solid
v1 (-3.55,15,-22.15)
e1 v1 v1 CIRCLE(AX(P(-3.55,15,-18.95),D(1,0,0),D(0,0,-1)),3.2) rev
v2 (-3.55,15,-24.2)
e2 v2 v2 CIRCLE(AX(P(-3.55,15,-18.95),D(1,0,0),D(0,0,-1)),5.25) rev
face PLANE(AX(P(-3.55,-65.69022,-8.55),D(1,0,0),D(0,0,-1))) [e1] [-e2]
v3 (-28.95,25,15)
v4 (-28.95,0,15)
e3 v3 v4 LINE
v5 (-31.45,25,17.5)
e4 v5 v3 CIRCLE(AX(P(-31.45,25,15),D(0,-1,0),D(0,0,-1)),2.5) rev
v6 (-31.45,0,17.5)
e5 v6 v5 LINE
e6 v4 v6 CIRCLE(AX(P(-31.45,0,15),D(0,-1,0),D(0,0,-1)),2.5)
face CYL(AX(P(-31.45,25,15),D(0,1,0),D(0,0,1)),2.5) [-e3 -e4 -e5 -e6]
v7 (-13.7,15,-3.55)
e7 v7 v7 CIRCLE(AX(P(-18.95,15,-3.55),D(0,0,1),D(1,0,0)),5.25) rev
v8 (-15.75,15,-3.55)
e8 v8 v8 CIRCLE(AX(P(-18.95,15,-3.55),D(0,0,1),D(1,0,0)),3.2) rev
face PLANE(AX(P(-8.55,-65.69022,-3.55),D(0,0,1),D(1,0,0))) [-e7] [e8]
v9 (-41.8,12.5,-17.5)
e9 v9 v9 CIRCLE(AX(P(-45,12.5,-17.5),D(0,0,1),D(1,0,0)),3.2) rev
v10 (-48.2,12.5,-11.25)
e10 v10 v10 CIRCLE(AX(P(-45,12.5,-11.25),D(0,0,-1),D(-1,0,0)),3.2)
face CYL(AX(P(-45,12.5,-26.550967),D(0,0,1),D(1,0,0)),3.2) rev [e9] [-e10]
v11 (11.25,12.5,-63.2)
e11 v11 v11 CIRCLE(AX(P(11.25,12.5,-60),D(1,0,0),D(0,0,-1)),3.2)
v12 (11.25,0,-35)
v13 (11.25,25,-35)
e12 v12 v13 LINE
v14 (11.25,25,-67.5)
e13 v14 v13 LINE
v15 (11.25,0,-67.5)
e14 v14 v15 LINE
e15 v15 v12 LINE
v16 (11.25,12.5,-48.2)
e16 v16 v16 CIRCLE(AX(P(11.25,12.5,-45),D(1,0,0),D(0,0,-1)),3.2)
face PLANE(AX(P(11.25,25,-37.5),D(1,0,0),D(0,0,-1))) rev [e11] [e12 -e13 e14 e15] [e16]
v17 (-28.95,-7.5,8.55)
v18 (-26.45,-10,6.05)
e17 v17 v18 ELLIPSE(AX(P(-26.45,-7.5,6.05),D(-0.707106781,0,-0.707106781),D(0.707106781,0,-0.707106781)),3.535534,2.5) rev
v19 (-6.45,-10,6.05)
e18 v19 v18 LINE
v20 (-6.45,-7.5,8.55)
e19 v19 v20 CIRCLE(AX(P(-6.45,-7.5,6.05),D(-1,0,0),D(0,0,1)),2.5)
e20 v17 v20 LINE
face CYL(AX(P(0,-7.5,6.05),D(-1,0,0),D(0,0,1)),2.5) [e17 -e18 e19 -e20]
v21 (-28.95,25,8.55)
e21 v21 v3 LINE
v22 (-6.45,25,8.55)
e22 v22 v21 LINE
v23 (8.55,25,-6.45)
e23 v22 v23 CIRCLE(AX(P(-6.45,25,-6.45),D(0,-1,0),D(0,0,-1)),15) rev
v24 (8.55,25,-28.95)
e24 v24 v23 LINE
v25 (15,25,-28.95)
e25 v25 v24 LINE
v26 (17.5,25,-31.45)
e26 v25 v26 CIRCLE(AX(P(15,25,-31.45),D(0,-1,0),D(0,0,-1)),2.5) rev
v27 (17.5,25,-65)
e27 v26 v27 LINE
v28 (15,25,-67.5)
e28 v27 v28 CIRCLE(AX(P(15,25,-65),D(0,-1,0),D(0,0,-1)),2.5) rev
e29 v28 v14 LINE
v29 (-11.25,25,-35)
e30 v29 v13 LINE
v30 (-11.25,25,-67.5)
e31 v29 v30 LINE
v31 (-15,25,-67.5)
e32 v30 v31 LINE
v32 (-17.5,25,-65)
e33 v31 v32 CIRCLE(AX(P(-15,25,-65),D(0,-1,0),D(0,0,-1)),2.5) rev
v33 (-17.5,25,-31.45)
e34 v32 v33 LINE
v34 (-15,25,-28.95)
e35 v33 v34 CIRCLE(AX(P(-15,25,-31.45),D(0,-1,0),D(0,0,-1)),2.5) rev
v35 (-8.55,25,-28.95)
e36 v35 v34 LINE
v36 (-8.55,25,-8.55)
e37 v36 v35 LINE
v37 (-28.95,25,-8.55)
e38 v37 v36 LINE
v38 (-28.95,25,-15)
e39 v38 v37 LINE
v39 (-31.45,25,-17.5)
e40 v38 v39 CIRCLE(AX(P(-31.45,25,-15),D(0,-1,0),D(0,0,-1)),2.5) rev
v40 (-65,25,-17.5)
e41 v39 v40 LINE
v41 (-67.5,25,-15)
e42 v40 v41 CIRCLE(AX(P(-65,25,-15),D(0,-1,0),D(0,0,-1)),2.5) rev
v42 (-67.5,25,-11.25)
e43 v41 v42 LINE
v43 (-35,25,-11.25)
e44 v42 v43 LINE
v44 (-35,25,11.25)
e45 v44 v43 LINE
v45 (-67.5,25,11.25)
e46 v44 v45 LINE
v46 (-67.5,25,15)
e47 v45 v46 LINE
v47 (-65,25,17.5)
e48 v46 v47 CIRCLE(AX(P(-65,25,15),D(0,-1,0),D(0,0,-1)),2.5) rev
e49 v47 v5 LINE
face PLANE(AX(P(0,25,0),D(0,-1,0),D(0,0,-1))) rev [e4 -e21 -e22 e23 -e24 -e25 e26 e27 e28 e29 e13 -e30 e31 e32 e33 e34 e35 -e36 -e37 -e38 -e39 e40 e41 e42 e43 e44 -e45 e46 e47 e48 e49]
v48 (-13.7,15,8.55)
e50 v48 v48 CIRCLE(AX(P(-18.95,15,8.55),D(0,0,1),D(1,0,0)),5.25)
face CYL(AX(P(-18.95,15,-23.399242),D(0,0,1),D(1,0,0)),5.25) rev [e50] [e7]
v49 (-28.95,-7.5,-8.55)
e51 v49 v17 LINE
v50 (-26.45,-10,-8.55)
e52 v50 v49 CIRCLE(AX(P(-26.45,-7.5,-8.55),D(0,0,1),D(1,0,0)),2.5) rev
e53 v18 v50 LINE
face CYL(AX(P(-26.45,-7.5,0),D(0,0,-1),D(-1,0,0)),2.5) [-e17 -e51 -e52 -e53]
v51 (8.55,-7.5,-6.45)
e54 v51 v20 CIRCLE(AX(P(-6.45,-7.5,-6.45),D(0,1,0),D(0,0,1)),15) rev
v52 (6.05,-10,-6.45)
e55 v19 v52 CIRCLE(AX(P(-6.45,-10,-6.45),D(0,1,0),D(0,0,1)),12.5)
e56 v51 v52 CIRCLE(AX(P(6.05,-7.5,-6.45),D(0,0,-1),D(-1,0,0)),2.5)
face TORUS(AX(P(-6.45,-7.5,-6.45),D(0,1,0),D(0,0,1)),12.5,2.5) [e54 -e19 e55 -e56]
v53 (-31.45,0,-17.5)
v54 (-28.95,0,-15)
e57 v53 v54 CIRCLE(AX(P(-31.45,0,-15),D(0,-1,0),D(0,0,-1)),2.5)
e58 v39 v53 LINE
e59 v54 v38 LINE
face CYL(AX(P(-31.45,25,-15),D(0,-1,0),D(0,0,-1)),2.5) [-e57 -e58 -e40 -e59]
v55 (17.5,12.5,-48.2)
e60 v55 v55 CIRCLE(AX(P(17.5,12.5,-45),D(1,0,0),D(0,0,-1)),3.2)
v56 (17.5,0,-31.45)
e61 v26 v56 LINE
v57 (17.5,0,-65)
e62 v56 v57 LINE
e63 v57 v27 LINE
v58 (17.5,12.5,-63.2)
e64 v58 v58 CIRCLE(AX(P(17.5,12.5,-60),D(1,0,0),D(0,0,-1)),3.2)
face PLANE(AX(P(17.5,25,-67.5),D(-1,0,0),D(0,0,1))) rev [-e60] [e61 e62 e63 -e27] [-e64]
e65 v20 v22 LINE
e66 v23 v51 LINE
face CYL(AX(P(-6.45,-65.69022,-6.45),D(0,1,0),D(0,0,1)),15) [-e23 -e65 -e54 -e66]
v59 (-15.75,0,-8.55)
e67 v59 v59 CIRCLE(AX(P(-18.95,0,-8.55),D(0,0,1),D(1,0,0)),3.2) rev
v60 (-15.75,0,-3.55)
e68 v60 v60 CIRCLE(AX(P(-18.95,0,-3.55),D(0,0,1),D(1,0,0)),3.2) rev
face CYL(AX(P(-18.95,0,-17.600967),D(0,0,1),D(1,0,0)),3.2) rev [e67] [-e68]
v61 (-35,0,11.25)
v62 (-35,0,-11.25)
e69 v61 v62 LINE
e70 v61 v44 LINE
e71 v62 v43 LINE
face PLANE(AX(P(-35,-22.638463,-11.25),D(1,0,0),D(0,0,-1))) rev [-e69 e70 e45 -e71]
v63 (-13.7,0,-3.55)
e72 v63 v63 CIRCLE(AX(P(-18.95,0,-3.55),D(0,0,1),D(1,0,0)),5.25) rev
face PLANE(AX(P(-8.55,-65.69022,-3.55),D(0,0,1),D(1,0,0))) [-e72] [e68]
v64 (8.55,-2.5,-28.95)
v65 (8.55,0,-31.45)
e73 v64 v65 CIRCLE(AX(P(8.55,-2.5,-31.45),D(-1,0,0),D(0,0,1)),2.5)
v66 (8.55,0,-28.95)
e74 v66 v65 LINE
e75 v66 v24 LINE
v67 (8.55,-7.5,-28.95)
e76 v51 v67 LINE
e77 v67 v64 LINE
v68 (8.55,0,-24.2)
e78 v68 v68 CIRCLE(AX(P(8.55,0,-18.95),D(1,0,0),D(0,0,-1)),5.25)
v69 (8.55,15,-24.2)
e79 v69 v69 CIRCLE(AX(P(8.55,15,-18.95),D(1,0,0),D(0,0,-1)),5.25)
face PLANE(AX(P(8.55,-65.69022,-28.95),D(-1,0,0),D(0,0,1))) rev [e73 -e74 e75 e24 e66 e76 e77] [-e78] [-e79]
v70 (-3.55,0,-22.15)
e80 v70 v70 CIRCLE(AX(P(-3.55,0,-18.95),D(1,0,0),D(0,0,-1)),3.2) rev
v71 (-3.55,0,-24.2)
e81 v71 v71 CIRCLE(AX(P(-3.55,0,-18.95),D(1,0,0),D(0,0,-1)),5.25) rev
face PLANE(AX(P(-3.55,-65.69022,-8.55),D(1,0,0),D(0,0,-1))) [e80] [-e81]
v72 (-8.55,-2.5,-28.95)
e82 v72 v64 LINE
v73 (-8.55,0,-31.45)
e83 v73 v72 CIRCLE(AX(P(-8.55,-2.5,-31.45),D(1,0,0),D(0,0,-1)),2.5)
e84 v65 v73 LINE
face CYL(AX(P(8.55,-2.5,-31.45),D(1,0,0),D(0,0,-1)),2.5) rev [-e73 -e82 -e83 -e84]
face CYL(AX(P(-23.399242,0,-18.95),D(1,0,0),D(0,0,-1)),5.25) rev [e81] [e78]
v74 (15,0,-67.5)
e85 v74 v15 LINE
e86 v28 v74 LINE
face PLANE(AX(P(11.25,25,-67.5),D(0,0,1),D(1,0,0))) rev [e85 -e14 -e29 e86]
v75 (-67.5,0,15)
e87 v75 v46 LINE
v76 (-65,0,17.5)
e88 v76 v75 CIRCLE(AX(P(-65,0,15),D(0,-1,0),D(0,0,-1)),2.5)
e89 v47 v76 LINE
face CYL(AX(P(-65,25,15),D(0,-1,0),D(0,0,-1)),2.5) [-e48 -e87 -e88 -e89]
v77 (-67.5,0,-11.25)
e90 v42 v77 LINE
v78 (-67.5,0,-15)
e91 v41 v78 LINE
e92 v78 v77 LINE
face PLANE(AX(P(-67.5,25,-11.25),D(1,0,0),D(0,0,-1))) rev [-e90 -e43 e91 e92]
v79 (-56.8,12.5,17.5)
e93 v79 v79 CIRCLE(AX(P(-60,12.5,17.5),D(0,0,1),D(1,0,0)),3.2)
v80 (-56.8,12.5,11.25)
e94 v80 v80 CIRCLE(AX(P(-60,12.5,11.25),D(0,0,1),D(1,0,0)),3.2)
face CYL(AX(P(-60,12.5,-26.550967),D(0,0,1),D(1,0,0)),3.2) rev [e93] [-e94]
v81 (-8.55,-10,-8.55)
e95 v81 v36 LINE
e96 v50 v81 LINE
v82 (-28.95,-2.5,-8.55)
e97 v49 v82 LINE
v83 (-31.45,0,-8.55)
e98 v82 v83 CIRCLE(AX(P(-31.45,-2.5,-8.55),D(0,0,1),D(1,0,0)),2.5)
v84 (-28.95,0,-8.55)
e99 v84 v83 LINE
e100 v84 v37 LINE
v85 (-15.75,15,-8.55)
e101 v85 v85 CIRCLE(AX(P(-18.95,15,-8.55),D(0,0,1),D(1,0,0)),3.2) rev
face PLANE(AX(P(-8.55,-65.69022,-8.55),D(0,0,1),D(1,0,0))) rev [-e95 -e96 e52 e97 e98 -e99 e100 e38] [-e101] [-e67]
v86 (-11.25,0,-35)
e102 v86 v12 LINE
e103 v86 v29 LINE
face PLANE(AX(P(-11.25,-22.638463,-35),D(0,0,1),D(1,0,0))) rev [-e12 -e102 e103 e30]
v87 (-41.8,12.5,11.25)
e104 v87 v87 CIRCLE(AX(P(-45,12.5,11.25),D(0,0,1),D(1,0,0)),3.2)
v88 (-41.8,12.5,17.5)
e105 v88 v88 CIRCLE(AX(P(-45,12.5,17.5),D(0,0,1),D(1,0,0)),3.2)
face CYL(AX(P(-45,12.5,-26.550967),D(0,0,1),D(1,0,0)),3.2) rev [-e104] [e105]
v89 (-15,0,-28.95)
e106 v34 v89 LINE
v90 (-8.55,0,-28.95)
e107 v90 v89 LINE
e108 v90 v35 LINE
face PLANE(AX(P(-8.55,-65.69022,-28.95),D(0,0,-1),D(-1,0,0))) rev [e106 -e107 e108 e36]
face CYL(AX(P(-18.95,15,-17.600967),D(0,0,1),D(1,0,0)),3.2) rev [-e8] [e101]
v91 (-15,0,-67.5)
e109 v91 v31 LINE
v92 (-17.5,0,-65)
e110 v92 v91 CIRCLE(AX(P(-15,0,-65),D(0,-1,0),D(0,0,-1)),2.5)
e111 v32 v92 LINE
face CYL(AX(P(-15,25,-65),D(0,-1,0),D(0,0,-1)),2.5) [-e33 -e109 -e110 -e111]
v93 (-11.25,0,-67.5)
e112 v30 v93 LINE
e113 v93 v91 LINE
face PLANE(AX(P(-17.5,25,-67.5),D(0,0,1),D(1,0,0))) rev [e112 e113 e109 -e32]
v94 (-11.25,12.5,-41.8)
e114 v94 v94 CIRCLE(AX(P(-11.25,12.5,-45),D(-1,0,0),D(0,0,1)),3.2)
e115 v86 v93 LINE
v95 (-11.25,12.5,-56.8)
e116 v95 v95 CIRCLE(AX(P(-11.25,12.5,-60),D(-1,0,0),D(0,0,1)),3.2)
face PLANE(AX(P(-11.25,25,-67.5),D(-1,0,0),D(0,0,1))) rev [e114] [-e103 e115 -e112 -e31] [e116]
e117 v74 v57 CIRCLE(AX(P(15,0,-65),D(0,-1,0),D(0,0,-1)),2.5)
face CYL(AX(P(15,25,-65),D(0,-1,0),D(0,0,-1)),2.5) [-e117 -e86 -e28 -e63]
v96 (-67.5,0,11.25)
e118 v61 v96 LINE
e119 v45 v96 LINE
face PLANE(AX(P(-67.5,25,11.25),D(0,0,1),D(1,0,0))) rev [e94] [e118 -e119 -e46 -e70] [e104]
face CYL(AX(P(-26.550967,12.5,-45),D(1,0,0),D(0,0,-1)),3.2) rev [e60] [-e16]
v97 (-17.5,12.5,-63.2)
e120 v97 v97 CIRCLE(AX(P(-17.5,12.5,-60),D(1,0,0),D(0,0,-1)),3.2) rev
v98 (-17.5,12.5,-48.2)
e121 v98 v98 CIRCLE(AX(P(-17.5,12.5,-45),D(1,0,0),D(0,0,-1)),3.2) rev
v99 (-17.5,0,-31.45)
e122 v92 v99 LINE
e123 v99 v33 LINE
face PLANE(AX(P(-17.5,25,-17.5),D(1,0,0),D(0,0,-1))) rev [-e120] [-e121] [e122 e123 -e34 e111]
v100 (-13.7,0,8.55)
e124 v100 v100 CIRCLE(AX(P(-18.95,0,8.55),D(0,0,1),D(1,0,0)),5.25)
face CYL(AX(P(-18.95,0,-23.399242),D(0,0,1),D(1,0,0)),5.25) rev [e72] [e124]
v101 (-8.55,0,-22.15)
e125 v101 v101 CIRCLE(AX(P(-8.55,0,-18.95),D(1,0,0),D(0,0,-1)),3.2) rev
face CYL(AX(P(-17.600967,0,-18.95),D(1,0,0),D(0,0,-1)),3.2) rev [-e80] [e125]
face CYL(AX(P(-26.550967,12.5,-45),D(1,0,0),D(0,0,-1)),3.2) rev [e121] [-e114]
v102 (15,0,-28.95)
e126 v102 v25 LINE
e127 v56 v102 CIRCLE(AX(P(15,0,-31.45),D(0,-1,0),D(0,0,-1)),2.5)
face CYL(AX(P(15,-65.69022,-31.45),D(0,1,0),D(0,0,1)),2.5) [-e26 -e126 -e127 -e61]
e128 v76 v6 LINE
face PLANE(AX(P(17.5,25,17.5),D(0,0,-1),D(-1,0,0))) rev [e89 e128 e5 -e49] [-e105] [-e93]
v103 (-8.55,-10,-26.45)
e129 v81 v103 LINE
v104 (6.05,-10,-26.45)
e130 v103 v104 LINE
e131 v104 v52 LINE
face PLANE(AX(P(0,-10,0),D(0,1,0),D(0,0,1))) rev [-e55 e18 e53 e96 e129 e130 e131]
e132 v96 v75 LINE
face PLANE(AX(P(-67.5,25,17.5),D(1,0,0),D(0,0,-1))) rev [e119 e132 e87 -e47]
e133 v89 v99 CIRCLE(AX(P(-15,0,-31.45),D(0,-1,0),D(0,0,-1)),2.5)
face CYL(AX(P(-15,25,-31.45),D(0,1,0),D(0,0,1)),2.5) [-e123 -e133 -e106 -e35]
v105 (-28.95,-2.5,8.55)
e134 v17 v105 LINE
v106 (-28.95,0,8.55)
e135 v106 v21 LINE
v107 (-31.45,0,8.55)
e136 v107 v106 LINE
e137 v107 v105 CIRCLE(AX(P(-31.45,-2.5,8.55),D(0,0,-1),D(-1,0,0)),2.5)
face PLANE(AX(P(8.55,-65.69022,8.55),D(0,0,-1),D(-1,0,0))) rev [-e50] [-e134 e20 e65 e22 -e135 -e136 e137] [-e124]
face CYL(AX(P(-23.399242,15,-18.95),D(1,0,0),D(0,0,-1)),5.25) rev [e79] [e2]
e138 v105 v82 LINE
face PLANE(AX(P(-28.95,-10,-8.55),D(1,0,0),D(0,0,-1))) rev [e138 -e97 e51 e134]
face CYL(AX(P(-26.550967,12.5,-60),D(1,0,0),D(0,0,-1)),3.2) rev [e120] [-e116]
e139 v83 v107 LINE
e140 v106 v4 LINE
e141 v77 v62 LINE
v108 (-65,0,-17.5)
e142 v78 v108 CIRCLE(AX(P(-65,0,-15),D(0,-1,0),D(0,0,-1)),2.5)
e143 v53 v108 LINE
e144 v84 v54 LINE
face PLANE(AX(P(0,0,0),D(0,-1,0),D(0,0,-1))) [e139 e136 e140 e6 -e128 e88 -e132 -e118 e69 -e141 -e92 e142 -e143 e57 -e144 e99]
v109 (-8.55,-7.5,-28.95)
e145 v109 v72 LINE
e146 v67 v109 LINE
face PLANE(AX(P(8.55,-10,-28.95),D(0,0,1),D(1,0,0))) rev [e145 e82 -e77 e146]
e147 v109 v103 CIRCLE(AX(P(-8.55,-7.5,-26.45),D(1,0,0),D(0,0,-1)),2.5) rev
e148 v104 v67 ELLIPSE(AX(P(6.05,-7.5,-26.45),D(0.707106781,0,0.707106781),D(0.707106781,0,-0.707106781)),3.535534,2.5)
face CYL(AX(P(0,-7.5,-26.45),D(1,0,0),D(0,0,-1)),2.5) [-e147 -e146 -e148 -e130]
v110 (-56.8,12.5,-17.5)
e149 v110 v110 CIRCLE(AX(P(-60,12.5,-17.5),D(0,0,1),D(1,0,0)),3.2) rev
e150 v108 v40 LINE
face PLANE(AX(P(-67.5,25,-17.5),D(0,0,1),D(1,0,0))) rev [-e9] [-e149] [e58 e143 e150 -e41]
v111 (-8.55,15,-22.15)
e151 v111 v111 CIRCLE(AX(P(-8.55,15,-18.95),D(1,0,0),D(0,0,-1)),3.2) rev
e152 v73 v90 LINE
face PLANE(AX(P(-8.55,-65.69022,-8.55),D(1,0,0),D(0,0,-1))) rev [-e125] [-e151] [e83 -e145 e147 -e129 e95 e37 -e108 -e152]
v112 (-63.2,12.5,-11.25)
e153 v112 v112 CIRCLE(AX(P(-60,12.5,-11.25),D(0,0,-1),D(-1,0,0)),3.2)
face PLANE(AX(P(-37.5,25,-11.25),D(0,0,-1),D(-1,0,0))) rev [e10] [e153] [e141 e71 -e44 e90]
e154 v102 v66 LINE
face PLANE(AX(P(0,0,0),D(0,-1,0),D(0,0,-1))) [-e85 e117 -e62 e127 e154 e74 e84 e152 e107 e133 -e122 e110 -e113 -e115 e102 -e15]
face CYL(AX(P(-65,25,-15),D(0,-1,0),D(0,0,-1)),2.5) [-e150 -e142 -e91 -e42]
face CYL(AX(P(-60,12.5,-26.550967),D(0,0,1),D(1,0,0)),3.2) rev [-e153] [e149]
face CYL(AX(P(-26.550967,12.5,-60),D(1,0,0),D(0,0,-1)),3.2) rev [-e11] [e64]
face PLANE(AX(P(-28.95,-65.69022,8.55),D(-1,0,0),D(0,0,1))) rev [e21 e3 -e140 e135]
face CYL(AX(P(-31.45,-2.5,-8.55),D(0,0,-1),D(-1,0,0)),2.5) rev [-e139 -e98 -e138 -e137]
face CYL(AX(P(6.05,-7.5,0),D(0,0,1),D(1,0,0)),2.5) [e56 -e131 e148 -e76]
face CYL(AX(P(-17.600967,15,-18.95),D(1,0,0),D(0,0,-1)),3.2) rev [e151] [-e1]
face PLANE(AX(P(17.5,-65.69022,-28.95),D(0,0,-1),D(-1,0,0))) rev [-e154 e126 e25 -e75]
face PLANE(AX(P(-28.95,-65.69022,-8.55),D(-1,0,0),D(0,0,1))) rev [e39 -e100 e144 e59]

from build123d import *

# Parameters (mm, degrees)
EXTRUDE_1_DEPTH      = 25
CUT_EXTRUDE_1_REACH  = 113.383
SKETCH_2_R           = 3.2
CUT_EXTRUDE_2_REACH  = 113.383
SKETCH_3_R           = 3.2
SKETCH_14_W          = 22.5
SKETCH_14_H          = 2.5
SKETCH_14_W_2        = 2.5
SKETCH_14_H_2        = 22.5
CUT_EXTRUDE_12_DEPTH = 25
SKETCH_5_W           = 20.4
SKETCH_5_H           = 20.4
CUT_EXTRUDE_7_DEPTH  = 25
EXTRUDE_2_DEPTH      = 10
SKETCH_10_R          = 3.2
CUT_EXTRUDE_8_DEPTH  = 17.1
SKETCH_11_R          = 5.25
CUT_EXTRUDE_9_DEPTH  = 12.1
SKETCH_12_R          = 3.2
CUT_EXTRUDE_10_DEPTH = 17.1
SKETCH_13_R          = 5.25
CUT_EXTRUDE_11_DEPTH = 12.1
FILLET_2_R           = 2.5
FILLET_3_R           = 15
FILLET_5_R           = 2.5


with BuildPart() as part:
    # 스케치1 → 보스-돌출1 (new body)
    with BuildSketch(Plane(origin=(0, 0, 0), x_dir=(1, 0, 0), z_dir=(0, 1, 0))):
        Polygon((-17.5, 67.5), (-11.25, 67.5), (-11.25, 37.5), (11.25, 37.5), (11.25, 67.5), (17.5, 67.5), (17.5, -17.5), (-67.5, -17.5), (-67.5, -11.25), (-37.5, -11.25), (-37.5, 11.25), (-67.5, 11.25), (-67.5, 17.5), (-17.5, 17.5), align=None)
    extrude(amount=EXTRUDE_1_DEPTH)

    # 컷-돌출1: up to this face of the body (flat: up to its plane)
    cut_extrude_1_end = Plane(part.part.faces().sort_by_distance((-17.5, 12.5, -42.5))[0])
    # 스케치2 → 컷-돌출1 (cut, up to the picked face)
    with BuildSketch(Plane(origin=(17.5, 0, 0), x_dir=(0, 0, -1), z_dir=(1, 0, 0)), mode=Mode.PRIVATE) as cut_extrude_1_sk1:
        with Locations((60, 12.5)):
            Circle(SKETCH_2_R)
    cut_extrude_1_tool1 = split(extrude(cut_extrude_1_sk1.sketch, amount=-CUT_EXTRUDE_1_REACH, mode=Mode.PRIVATE), bisect_by=cut_extrude_1_end, keep=Keep.BOTH, mode=Mode.PRIVATE)
    # 스케치2 → 컷-돌출1 (cut, up to the picked face)
    with BuildSketch(Plane(origin=(17.5, 0, 0), x_dir=(0, 0, -1), z_dir=(1, 0, 0)), mode=Mode.PRIVATE) as cut_extrude_1_sk2:
        with Locations((45, 12.5)):
            Circle(SKETCH_2_R)
    cut_extrude_1_tool2 = split(extrude(cut_extrude_1_sk2.sketch, amount=-CUT_EXTRUDE_1_REACH, mode=Mode.PRIVATE), bisect_by=cut_extrude_1_end, keep=Keep.BOTH, mode=Mode.PRIVATE)
    add(cut_extrude_1_tool1.solids().sort_by(Axis((17.5, 12.5, -60), (-1, 0, 0)))[0], mode=Mode.SUBTRACT)
    add(cut_extrude_1_tool2.solids().sort_by(Axis((17.5, 12.5, -45), (-1, 0, 0)))[0], mode=Mode.SUBTRACT)

    # 컷-돌출2: up to this face of the body (flat: up to its plane)
    cut_extrude_2_end = Plane(part.part.faces().sort_by_distance((-42.5, 12.5, -17.5))[0])
    # 스케치3 → 컷-돌출2 (cut, up to the picked face)
    with BuildSketch(Plane.XY.offset(17.5), mode=Mode.PRIVATE) as cut_extrude_2_sk1:
        with Locations((-60, 12.5)):
            Circle(SKETCH_3_R)
    cut_extrude_2_tool1 = split(extrude(cut_extrude_2_sk1.sketch, amount=-CUT_EXTRUDE_2_REACH, mode=Mode.PRIVATE), bisect_by=cut_extrude_2_end, keep=Keep.BOTH, mode=Mode.PRIVATE)
    # 스케치3 → 컷-돌출2 (cut, up to the picked face)
    with BuildSketch(Plane.XY.offset(17.5), mode=Mode.PRIVATE) as cut_extrude_2_sk2:
        with Locations((-45, 12.5)):
            Circle(SKETCH_3_R)
    cut_extrude_2_tool2 = split(extrude(cut_extrude_2_sk2.sketch, amount=-CUT_EXTRUDE_2_REACH, mode=Mode.PRIVATE), bisect_by=cut_extrude_2_end, keep=Keep.BOTH, mode=Mode.PRIVATE)
    add(cut_extrude_2_tool1.solids().sort_by(Axis((-60, 12.5, 17.5), (0, 0, -1)))[0], mode=Mode.SUBTRACT)
    add(cut_extrude_2_tool2.solids().sort_by(Axis((-45, 12.5, 17.5), (0, 0, -1)))[0], mode=Mode.SUBTRACT)

    # 스케치14 → 컷-돌출12 (cut)
    with BuildSketch(Plane(origin=(0, 25, 0), x_dir=(1, 0, 0), z_dir=(0, 1, 0))):
        with Locations((0, 36.25)):
            Rectangle(SKETCH_14_W, SKETCH_14_H)
        with Locations((-36.25, 0)):
            Rectangle(SKETCH_14_W_2, SKETCH_14_H_2)
    extrude(amount=-CUT_EXTRUDE_12_DEPTH, mode=Mode.SUBTRACT)

    # 스케치5 → 컷-돌출7 (cut)
    with BuildSketch(Plane(origin=(0, 25, 0), x_dir=(1, 0, 0), z_dir=(0, 1, 0))):
        with Locations((-18.75, 18.75)):
            Rectangle(SKETCH_5_W, SKETCH_5_H)
        Polygon((-28.95, -8.55), (-28.95, -17.5), (17.5, -17.5), (17.5, 28.95), (8.55, 28.95), (8.55, -8.55), align=None)
    extrude(amount=-CUT_EXTRUDE_7_DEPTH, mode=Mode.SUBTRACT)

    # 스케치15 → 보스-돌출2 (add)
    with BuildSketch(Plane.XZ):
        Polygon((8.55, 8.55), (8.55, -28.95), (-8.55, -28.95), (-8.55, -8.55), (-28.95, -8.55), (-28.95, 8.55), align=None)
    extrude(amount=EXTRUDE_2_DEPTH)

    # 스케치10 → 컷-돌출8 (cut)
    with BuildSketch(Plane.XY.offset(8.55)):
        with Locations((-18.95, 15)):
            Circle(SKETCH_10_R)
        with Locations((-18.95, 0)):
            Circle(SKETCH_10_R)
    extrude(amount=-CUT_EXTRUDE_8_DEPTH, mode=Mode.SUBTRACT)

    # 스케치11 → 컷-돌출9 (cut)
    with BuildSketch(Plane.XY.offset(8.55)):
        with Locations((-18.95, 15)):
            Circle(SKETCH_11_R)
        with Locations((-18.95, 0)):
            Circle(SKETCH_11_R)
    extrude(amount=-CUT_EXTRUDE_9_DEPTH, mode=Mode.SUBTRACT)

    # 스케치12 → 컷-돌출10 (cut)
    with BuildSketch(Plane(origin=(8.55, 0, 0), x_dir=(0, 0, -1), z_dir=(1, 0, 0))):
        with Locations((18.95, 15)):
            Circle(SKETCH_12_R)
        with Locations((18.95, 0)):
            Circle(SKETCH_12_R)
    extrude(amount=-CUT_EXTRUDE_10_DEPTH, mode=Mode.SUBTRACT)

    # 스케치13 → 컷-돌출11 (cut)
    with BuildSketch(Plane(origin=(8.55, 0, 0), x_dir=(0, 0, -1), z_dir=(1, 0, 0))):
        with Locations((18.95, 15)):
            Circle(SKETCH_13_R)
        with Locations((18.95, 0)):
            Circle(SKETCH_13_R)
    extrude(amount=-CUT_EXTRUDE_11_DEPTH, mode=Mode.SUBTRACT)

    # 필렛2
    fillet_2_edges = [part.edges().sort_by_distance(p)[0] for p in [
        (-17.5, 12.5, -28.95),
        (-28.95, 12.5, -17.5),
        (-28.95, 12.5, 17.5),
        (17.5, 12.5, -28.95),
        (-10.2, -10, 8.55),
        (-28.95, -10, 0),
        (0, -10, -28.95),
        (8.55, -10, -10.2),
        (-17.5, 12.5, -67.5),
        (17.5, 12.5, -67.5),
        (-67.5, 12.5, 17.5),
        (-67.5, 12.5, -17.5),
    ]]
    fillet(fillet_2_edges, radius=FILLET_2_R)

    # 필렛3
    # the kernel refuses this fillet: 15 mm, written as the material it takes off along each edge
    with BuildSketch(Plane(origin=(-6.45, -10, -6.45), x_dir=(1, 0, 0), z_dir=(0, 0, -1))) as fillet_3_piece_1:
        with BuildLine():
            CenterArc((12.5, -2.5), 2.5, 0, 90)
            Line((15, -2.5), (15, 0))
            Line((15, 0), (12.5, 0))
        make_face()
    revolve(axis=Axis((-6.45, -10, -6.45), (0, -1, 0)), revolution_arc=90, mode=Mode.SUBTRACT)
    with BuildSketch(Plane(origin=(8.55, -10, 8.55), x_dir=(0, 0, -1), z_dir=(0, 1, 0))) as fillet_3_piece_2:
        with BuildLine():
            CenterArc((FILLET_3_R, FILLET_3_R), FILLET_3_R, 180, 90)
            Line((0, FILLET_3_R), (0, 0))
            Line((0, 0), (FILLET_3_R, 0))
        make_face()
    extrude(amount=72.5, mode=Mode.SUBTRACT)

    # 필렛5
    fillet_5_edges = [part.edges().sort_by_distance(p)[0] for p in [
        (-28.95, 0, 0),
        (0, 0, -28.95),
    ]]
    fillet(fillet_5_edges, radius=FILLET_5_R)


solid = part.part
